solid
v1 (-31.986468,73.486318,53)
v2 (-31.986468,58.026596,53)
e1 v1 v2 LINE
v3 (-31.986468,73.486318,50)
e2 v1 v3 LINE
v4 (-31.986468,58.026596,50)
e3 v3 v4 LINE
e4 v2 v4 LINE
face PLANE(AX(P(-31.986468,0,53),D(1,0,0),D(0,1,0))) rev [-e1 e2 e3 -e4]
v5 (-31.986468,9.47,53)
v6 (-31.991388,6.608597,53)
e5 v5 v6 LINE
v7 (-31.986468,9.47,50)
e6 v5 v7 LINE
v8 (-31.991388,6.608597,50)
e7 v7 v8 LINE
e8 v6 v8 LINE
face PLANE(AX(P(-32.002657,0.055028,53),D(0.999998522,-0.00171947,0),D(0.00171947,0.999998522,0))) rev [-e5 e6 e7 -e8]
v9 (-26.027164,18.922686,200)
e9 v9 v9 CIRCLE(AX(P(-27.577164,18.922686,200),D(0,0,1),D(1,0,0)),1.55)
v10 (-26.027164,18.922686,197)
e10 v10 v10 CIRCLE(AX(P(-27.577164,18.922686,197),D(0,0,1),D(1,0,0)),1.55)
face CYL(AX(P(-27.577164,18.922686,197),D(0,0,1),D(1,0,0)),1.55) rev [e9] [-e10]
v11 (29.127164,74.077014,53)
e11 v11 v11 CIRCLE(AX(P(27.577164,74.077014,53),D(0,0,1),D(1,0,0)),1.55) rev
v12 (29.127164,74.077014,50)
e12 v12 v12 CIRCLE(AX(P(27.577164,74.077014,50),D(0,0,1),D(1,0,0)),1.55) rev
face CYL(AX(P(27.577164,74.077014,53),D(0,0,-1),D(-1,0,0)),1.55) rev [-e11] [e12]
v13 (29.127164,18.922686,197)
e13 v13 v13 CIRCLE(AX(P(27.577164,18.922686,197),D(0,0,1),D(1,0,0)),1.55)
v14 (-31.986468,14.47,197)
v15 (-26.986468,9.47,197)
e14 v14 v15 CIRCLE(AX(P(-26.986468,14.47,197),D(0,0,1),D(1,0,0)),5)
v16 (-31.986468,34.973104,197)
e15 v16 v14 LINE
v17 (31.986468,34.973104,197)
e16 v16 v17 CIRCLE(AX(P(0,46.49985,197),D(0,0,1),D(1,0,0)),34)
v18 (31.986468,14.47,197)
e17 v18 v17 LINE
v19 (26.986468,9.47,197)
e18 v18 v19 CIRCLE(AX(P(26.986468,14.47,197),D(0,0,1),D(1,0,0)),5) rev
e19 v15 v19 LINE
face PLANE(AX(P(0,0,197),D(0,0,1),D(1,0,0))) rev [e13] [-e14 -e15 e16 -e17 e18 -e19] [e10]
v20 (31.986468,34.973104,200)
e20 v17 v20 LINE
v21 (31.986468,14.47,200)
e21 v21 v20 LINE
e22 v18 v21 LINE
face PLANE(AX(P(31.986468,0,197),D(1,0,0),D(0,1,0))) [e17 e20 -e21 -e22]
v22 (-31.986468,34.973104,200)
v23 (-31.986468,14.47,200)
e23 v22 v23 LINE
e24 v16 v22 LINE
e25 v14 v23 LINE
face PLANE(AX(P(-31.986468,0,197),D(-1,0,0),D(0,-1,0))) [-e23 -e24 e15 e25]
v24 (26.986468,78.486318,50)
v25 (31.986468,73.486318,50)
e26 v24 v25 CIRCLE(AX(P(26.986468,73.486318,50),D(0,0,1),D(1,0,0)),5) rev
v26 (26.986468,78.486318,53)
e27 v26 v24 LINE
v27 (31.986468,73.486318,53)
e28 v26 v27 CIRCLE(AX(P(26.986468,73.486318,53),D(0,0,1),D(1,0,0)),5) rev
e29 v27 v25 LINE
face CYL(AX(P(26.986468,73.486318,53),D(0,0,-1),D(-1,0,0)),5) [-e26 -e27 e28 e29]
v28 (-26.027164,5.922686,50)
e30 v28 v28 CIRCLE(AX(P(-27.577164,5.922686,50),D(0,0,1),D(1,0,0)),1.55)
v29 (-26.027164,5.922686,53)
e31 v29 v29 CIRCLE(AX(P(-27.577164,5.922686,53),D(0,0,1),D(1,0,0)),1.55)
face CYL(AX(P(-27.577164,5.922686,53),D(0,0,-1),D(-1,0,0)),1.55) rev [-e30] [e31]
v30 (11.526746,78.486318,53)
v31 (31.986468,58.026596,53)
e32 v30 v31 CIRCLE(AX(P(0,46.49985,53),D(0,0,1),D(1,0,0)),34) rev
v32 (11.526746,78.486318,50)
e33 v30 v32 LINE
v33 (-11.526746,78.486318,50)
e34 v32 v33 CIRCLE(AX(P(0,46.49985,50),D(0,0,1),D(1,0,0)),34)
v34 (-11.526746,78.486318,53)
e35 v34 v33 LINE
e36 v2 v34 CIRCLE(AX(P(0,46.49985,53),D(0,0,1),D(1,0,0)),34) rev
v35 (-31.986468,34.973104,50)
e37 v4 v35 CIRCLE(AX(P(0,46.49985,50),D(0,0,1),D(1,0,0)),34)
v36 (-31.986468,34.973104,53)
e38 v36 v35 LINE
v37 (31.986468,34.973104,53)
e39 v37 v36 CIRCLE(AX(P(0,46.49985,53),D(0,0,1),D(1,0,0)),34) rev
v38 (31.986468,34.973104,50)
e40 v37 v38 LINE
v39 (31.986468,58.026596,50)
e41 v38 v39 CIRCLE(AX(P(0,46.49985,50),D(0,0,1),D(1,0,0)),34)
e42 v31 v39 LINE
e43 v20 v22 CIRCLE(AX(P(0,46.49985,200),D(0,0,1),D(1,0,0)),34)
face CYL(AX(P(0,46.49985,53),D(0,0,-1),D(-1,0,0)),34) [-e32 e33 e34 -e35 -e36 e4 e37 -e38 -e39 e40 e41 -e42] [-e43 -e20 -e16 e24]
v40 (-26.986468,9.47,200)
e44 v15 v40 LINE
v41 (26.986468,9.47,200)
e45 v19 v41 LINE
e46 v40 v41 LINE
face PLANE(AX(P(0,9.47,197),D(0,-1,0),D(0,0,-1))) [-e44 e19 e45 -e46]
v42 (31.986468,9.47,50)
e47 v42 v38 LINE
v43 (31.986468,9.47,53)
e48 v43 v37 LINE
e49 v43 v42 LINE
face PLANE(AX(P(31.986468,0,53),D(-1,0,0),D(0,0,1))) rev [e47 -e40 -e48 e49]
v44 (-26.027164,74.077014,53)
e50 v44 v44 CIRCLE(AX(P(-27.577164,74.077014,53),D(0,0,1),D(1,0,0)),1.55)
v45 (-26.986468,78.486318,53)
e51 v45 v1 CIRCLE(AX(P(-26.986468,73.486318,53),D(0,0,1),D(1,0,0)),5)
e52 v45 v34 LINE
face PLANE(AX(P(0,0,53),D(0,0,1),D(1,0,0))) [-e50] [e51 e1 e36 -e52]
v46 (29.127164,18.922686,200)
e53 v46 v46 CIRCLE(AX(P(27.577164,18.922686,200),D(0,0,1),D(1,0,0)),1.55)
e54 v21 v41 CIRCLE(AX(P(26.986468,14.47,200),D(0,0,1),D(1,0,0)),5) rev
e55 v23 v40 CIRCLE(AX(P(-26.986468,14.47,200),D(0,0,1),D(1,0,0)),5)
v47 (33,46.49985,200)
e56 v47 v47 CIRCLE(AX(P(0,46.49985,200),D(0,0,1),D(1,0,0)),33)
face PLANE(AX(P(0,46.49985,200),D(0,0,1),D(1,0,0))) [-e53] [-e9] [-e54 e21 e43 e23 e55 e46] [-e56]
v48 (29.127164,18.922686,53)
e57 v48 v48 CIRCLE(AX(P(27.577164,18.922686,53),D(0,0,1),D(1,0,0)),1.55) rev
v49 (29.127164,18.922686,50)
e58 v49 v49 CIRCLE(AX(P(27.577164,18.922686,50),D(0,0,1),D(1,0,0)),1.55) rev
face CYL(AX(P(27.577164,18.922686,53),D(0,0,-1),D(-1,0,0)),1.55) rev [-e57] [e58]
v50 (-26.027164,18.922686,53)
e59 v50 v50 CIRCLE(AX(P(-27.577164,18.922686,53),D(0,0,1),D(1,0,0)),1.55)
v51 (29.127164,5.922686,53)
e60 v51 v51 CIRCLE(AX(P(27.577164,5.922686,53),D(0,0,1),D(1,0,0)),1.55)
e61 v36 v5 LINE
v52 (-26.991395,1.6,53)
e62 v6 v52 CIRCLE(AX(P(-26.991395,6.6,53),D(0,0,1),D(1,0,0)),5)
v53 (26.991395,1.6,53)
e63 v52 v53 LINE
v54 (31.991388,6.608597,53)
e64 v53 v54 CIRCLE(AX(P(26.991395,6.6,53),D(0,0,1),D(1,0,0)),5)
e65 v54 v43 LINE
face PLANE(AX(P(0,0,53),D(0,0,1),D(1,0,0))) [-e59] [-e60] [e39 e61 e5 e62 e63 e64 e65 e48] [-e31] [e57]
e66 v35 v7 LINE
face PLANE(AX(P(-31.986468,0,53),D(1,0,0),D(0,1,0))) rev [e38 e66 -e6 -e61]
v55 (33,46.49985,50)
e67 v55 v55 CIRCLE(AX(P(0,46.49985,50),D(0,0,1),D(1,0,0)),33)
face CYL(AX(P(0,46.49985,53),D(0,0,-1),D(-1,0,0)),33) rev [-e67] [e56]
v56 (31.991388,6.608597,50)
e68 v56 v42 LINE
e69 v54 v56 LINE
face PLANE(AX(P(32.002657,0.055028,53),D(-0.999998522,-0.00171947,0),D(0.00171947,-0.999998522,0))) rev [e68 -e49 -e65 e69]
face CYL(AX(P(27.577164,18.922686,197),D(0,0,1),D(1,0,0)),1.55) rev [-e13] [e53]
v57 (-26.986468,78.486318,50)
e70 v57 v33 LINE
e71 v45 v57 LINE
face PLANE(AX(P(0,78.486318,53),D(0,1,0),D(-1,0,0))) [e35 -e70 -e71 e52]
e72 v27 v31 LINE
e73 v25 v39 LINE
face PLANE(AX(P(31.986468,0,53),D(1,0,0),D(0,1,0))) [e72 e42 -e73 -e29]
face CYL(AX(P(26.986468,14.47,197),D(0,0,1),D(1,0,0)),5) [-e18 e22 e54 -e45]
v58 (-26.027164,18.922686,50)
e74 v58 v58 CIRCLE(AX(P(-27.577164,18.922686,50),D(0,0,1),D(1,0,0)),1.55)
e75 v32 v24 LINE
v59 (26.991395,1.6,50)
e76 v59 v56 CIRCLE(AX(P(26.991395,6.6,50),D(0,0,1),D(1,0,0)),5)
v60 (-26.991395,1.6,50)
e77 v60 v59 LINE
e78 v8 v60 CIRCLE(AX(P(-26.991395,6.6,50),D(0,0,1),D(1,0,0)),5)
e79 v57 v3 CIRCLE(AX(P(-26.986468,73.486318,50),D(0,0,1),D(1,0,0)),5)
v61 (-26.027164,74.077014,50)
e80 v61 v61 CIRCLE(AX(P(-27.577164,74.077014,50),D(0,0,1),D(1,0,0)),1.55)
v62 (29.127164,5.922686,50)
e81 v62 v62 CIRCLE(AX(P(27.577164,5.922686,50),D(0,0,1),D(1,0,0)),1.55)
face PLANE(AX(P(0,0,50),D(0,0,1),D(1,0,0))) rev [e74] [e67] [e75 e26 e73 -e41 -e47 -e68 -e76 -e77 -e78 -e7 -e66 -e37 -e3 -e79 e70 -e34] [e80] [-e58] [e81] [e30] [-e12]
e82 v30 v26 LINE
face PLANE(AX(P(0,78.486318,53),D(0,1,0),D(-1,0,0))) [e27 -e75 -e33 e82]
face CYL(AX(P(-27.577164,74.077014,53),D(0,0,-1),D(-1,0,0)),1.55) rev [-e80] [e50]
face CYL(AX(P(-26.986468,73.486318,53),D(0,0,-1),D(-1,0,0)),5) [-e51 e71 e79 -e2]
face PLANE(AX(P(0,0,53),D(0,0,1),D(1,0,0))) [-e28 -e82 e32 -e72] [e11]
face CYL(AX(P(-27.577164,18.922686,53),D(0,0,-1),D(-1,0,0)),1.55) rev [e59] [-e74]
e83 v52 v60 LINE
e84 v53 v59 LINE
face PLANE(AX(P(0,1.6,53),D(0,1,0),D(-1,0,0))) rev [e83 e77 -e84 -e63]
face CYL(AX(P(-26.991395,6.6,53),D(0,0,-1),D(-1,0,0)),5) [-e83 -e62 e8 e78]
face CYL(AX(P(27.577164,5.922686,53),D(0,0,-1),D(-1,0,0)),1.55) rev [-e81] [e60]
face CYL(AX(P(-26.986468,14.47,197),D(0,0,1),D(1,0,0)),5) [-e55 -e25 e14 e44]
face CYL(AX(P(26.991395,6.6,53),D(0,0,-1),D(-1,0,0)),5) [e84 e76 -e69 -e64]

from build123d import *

# Parameters (mm, degrees)
SKETCH_2_R            = 1.5499999999999978
SKETCH_2_R_2          = 1.5500000000187404
SKETCH_2_R_3          = 33.000000000018005
SKETCH_2_R_4          = 1.5500000000180028
EXTRUDE_1_DEPTH       = 3
EXTRUDE_START         = 3
EXTRUDE_2_OUTLINE_R   = 34
EXTRUDE_2_OUTLINE_R_2 = 33
EXTRUDE_2_DEPTH       = 147
EXTRUDE_START_2       = -3
SKETCH_5_R            = 1.5499999999999978
SKETCH_5_R_2          = 1.5500000000187402
EXTRUDE_3_DEPTH       = 3


# Read off the part's stored shape, not the designer's step: 凸台-拉伸2
with BuildPart() as part:
    # 草图2 → 凸台-拉伸1 (new body)
    with BuildSketch(Plane.XY.offset(50)):
        with BuildLine():
            Line((-31.98646774923986, 34.973103667177796), (-31.986467749238788, 9.470000000000049))
            Line((-31.986467749238788, 9.47000000000005), (-31.99138785319973, 6.608597351179577))
            ThreePointArc((-31.99138785319973, 6.608597351179577), (-30.529967467729293, 3.0675070244866425), (-26.991395244649887, 1.5999999999999854))
            Line((-26.991395244649887, 1.5999999999999854), (26.99139524464973, 1.6000000000000048))
            ThreePointArc((26.99139524464973, 1.600000000000005), (30.529967467729193, 3.067507024486723), (31.99138785319957, 6.6085973511797595))
            Line((31.99138785319957, 6.6085973511797595), (31.98646774923853, 9.470000000001768))
            Line((31.98646774923853, 9.470000000001768), (31.986467749238717, 34.9731036671784))
            ThreePointArc((31.986467749239328, 34.97310366717818), (34.000000000018005, 46.499849995960744), (31.986467749239164, 58.026596324743274))
            Line((31.986467749238994, 58.02659632474322), (31.98646774923853, 73.4863177451979))
            ThreePointArc((31.986467749238525, 73.4863177451979), (30.52200165517117, 77.02185165113154), (26.986467749237562, 78.486317745199))
            Line((26.986467749237562, 78.486317745199), (11.526746328783656, 78.48631774519934))
            ThreePointArc((11.526746328783661, 78.48631774519934), (1.3678e-13, 80.49984999597851), (-11.5267463287834, 78.48631774519944))
            Line((-11.526746328783396, 78.48631774519944), (-26.98646774923796, 78.48631774520034))
            ThreePointArc((-26.98646774923796, 78.48631774520034), (-30.52200165517142, 77.02185165113266), (-31.98646774923918, 73.48631774519924))
            Line((-31.986467749239182, 73.48631774519924), (-31.986467749239175, 58.02659632474571))
            ThreePointArc((-31.986467749239328, 58.026596324742826), (-34.000000000018005, 46.4998499959604), (-31.986467749239267, 34.973103667178016))
        make_face()
        with Locations((-27.577164466275363, 5.922685529685147)):
            Circle(SKETCH_2_R, mode=Mode.SUBTRACT)
        with Locations((-27.577164466275352, 18.922685529685147)):
            Circle(SKETCH_2_R_2, mode=Mode.SUBTRACT)
        with Locations((27.57716446627534, 5.92268552968515)):
            Circle(SKETCH_2_R, mode=Mode.SUBTRACT)
        with Locations((27.577164466275352, 18.922685529685147)):
            Circle(SKETCH_2_R_2, mode=Mode.SUBTRACT)
        with Locations((0, 46.4998499959605)):
            Circle(SKETCH_2_R_3, mode=Mode.SUBTRACT)
        with Locations((-27.577164466275352, 74.07701446223585)):
            Circle(SKETCH_2_R_4, mode=Mode.SUBTRACT)
        with Locations((27.577164466275352, 74.07701446223585)):
            Circle(SKETCH_2_R_4, mode=Mode.SUBTRACT)
    extrude(amount=EXTRUDE_1_DEPTH)

    # 凸台-拉伸2 outline → 凸台-拉伸2 (add)
    with BuildSketch(Plane.XY.offset(50).offset(EXTRUDE_START)):
        with Locations((0, 46.499849996)):
            Circle(EXTRUDE_2_OUTLINE_R)
        with Locations((0, 46.499849996)):
            Circle(EXTRUDE_2_OUTLINE_R_2, mode=Mode.SUBTRACT)
    extrude(amount=EXTRUDE_2_DEPTH)

    # 草图5 → 凸台-拉伸3 (add)
    # profile 1 of 3: a face of its own
    with BuildSketch(Plane.XY.offset(200).offset(EXTRUDE_START_2)):
        with Locations((27.57716446627534, 5.92268552968515)):
            Circle(SKETCH_5_R)
    # profile 2 of 3: a face of its own
    with BuildSketch(Plane.XY.offset(200).offset(EXTRUDE_START_2)):
        with Locations((-27.577164466275363, 5.922685529685147)):
            Circle(SKETCH_5_R)
    # profile 3 of 3: a face of its own
    with BuildSketch(Plane.XY.offset(200).offset(EXTRUDE_START_2)):
        with BuildLine():
            Line((31.986467749238557, 14.470000000001733), (31.986467749238717, 34.9731036671784))
            ThreePointArc((31.986467749238717, 34.9731036671784), (6.9664e-13, 12.499849995942498), (-31.98646774923986, 34.973103667177796))
            Line((-31.98646774923986, 34.973103667177796), (-31.986467749238994, 14.470000000001559))
            ThreePointArc((-31.986467749238994, 14.470000000001559), (-30.522001655171657, 10.934466094068965), (-26.986467749239004, 9.470000000001766))
            Line((-26.986467749239004, 9.470000000001766), (26.986467749238557, 9.470000000001766))
            ThreePointArc((26.986467749238557, 9.470000000001766), (30.52200165517128, 10.93446609406902), (31.986467749238557, 14.470000000001733))
        make_face()
        with Locations((27.577164466275352, 18.922685529685147)):
            Circle(SKETCH_5_R_2, mode=Mode.SUBTRACT)
        with Locations((-27.577164466275352, 18.922685529685147)):
            Circle(SKETCH_5_R_2, mode=Mode.SUBTRACT)
    extrude(amount=EXTRUDE_3_DEPTH)


with BuildPart() as extrude_3_kept_piece:
    # of the separate pieces the step leaves, the one the design keeps (extrude_3_pieces_kept)
    add(part.part.solids().sort_by_distance((-31.986467749, 58.026596325, 50))[0])


solid = extrude_3_kept_piece.part
